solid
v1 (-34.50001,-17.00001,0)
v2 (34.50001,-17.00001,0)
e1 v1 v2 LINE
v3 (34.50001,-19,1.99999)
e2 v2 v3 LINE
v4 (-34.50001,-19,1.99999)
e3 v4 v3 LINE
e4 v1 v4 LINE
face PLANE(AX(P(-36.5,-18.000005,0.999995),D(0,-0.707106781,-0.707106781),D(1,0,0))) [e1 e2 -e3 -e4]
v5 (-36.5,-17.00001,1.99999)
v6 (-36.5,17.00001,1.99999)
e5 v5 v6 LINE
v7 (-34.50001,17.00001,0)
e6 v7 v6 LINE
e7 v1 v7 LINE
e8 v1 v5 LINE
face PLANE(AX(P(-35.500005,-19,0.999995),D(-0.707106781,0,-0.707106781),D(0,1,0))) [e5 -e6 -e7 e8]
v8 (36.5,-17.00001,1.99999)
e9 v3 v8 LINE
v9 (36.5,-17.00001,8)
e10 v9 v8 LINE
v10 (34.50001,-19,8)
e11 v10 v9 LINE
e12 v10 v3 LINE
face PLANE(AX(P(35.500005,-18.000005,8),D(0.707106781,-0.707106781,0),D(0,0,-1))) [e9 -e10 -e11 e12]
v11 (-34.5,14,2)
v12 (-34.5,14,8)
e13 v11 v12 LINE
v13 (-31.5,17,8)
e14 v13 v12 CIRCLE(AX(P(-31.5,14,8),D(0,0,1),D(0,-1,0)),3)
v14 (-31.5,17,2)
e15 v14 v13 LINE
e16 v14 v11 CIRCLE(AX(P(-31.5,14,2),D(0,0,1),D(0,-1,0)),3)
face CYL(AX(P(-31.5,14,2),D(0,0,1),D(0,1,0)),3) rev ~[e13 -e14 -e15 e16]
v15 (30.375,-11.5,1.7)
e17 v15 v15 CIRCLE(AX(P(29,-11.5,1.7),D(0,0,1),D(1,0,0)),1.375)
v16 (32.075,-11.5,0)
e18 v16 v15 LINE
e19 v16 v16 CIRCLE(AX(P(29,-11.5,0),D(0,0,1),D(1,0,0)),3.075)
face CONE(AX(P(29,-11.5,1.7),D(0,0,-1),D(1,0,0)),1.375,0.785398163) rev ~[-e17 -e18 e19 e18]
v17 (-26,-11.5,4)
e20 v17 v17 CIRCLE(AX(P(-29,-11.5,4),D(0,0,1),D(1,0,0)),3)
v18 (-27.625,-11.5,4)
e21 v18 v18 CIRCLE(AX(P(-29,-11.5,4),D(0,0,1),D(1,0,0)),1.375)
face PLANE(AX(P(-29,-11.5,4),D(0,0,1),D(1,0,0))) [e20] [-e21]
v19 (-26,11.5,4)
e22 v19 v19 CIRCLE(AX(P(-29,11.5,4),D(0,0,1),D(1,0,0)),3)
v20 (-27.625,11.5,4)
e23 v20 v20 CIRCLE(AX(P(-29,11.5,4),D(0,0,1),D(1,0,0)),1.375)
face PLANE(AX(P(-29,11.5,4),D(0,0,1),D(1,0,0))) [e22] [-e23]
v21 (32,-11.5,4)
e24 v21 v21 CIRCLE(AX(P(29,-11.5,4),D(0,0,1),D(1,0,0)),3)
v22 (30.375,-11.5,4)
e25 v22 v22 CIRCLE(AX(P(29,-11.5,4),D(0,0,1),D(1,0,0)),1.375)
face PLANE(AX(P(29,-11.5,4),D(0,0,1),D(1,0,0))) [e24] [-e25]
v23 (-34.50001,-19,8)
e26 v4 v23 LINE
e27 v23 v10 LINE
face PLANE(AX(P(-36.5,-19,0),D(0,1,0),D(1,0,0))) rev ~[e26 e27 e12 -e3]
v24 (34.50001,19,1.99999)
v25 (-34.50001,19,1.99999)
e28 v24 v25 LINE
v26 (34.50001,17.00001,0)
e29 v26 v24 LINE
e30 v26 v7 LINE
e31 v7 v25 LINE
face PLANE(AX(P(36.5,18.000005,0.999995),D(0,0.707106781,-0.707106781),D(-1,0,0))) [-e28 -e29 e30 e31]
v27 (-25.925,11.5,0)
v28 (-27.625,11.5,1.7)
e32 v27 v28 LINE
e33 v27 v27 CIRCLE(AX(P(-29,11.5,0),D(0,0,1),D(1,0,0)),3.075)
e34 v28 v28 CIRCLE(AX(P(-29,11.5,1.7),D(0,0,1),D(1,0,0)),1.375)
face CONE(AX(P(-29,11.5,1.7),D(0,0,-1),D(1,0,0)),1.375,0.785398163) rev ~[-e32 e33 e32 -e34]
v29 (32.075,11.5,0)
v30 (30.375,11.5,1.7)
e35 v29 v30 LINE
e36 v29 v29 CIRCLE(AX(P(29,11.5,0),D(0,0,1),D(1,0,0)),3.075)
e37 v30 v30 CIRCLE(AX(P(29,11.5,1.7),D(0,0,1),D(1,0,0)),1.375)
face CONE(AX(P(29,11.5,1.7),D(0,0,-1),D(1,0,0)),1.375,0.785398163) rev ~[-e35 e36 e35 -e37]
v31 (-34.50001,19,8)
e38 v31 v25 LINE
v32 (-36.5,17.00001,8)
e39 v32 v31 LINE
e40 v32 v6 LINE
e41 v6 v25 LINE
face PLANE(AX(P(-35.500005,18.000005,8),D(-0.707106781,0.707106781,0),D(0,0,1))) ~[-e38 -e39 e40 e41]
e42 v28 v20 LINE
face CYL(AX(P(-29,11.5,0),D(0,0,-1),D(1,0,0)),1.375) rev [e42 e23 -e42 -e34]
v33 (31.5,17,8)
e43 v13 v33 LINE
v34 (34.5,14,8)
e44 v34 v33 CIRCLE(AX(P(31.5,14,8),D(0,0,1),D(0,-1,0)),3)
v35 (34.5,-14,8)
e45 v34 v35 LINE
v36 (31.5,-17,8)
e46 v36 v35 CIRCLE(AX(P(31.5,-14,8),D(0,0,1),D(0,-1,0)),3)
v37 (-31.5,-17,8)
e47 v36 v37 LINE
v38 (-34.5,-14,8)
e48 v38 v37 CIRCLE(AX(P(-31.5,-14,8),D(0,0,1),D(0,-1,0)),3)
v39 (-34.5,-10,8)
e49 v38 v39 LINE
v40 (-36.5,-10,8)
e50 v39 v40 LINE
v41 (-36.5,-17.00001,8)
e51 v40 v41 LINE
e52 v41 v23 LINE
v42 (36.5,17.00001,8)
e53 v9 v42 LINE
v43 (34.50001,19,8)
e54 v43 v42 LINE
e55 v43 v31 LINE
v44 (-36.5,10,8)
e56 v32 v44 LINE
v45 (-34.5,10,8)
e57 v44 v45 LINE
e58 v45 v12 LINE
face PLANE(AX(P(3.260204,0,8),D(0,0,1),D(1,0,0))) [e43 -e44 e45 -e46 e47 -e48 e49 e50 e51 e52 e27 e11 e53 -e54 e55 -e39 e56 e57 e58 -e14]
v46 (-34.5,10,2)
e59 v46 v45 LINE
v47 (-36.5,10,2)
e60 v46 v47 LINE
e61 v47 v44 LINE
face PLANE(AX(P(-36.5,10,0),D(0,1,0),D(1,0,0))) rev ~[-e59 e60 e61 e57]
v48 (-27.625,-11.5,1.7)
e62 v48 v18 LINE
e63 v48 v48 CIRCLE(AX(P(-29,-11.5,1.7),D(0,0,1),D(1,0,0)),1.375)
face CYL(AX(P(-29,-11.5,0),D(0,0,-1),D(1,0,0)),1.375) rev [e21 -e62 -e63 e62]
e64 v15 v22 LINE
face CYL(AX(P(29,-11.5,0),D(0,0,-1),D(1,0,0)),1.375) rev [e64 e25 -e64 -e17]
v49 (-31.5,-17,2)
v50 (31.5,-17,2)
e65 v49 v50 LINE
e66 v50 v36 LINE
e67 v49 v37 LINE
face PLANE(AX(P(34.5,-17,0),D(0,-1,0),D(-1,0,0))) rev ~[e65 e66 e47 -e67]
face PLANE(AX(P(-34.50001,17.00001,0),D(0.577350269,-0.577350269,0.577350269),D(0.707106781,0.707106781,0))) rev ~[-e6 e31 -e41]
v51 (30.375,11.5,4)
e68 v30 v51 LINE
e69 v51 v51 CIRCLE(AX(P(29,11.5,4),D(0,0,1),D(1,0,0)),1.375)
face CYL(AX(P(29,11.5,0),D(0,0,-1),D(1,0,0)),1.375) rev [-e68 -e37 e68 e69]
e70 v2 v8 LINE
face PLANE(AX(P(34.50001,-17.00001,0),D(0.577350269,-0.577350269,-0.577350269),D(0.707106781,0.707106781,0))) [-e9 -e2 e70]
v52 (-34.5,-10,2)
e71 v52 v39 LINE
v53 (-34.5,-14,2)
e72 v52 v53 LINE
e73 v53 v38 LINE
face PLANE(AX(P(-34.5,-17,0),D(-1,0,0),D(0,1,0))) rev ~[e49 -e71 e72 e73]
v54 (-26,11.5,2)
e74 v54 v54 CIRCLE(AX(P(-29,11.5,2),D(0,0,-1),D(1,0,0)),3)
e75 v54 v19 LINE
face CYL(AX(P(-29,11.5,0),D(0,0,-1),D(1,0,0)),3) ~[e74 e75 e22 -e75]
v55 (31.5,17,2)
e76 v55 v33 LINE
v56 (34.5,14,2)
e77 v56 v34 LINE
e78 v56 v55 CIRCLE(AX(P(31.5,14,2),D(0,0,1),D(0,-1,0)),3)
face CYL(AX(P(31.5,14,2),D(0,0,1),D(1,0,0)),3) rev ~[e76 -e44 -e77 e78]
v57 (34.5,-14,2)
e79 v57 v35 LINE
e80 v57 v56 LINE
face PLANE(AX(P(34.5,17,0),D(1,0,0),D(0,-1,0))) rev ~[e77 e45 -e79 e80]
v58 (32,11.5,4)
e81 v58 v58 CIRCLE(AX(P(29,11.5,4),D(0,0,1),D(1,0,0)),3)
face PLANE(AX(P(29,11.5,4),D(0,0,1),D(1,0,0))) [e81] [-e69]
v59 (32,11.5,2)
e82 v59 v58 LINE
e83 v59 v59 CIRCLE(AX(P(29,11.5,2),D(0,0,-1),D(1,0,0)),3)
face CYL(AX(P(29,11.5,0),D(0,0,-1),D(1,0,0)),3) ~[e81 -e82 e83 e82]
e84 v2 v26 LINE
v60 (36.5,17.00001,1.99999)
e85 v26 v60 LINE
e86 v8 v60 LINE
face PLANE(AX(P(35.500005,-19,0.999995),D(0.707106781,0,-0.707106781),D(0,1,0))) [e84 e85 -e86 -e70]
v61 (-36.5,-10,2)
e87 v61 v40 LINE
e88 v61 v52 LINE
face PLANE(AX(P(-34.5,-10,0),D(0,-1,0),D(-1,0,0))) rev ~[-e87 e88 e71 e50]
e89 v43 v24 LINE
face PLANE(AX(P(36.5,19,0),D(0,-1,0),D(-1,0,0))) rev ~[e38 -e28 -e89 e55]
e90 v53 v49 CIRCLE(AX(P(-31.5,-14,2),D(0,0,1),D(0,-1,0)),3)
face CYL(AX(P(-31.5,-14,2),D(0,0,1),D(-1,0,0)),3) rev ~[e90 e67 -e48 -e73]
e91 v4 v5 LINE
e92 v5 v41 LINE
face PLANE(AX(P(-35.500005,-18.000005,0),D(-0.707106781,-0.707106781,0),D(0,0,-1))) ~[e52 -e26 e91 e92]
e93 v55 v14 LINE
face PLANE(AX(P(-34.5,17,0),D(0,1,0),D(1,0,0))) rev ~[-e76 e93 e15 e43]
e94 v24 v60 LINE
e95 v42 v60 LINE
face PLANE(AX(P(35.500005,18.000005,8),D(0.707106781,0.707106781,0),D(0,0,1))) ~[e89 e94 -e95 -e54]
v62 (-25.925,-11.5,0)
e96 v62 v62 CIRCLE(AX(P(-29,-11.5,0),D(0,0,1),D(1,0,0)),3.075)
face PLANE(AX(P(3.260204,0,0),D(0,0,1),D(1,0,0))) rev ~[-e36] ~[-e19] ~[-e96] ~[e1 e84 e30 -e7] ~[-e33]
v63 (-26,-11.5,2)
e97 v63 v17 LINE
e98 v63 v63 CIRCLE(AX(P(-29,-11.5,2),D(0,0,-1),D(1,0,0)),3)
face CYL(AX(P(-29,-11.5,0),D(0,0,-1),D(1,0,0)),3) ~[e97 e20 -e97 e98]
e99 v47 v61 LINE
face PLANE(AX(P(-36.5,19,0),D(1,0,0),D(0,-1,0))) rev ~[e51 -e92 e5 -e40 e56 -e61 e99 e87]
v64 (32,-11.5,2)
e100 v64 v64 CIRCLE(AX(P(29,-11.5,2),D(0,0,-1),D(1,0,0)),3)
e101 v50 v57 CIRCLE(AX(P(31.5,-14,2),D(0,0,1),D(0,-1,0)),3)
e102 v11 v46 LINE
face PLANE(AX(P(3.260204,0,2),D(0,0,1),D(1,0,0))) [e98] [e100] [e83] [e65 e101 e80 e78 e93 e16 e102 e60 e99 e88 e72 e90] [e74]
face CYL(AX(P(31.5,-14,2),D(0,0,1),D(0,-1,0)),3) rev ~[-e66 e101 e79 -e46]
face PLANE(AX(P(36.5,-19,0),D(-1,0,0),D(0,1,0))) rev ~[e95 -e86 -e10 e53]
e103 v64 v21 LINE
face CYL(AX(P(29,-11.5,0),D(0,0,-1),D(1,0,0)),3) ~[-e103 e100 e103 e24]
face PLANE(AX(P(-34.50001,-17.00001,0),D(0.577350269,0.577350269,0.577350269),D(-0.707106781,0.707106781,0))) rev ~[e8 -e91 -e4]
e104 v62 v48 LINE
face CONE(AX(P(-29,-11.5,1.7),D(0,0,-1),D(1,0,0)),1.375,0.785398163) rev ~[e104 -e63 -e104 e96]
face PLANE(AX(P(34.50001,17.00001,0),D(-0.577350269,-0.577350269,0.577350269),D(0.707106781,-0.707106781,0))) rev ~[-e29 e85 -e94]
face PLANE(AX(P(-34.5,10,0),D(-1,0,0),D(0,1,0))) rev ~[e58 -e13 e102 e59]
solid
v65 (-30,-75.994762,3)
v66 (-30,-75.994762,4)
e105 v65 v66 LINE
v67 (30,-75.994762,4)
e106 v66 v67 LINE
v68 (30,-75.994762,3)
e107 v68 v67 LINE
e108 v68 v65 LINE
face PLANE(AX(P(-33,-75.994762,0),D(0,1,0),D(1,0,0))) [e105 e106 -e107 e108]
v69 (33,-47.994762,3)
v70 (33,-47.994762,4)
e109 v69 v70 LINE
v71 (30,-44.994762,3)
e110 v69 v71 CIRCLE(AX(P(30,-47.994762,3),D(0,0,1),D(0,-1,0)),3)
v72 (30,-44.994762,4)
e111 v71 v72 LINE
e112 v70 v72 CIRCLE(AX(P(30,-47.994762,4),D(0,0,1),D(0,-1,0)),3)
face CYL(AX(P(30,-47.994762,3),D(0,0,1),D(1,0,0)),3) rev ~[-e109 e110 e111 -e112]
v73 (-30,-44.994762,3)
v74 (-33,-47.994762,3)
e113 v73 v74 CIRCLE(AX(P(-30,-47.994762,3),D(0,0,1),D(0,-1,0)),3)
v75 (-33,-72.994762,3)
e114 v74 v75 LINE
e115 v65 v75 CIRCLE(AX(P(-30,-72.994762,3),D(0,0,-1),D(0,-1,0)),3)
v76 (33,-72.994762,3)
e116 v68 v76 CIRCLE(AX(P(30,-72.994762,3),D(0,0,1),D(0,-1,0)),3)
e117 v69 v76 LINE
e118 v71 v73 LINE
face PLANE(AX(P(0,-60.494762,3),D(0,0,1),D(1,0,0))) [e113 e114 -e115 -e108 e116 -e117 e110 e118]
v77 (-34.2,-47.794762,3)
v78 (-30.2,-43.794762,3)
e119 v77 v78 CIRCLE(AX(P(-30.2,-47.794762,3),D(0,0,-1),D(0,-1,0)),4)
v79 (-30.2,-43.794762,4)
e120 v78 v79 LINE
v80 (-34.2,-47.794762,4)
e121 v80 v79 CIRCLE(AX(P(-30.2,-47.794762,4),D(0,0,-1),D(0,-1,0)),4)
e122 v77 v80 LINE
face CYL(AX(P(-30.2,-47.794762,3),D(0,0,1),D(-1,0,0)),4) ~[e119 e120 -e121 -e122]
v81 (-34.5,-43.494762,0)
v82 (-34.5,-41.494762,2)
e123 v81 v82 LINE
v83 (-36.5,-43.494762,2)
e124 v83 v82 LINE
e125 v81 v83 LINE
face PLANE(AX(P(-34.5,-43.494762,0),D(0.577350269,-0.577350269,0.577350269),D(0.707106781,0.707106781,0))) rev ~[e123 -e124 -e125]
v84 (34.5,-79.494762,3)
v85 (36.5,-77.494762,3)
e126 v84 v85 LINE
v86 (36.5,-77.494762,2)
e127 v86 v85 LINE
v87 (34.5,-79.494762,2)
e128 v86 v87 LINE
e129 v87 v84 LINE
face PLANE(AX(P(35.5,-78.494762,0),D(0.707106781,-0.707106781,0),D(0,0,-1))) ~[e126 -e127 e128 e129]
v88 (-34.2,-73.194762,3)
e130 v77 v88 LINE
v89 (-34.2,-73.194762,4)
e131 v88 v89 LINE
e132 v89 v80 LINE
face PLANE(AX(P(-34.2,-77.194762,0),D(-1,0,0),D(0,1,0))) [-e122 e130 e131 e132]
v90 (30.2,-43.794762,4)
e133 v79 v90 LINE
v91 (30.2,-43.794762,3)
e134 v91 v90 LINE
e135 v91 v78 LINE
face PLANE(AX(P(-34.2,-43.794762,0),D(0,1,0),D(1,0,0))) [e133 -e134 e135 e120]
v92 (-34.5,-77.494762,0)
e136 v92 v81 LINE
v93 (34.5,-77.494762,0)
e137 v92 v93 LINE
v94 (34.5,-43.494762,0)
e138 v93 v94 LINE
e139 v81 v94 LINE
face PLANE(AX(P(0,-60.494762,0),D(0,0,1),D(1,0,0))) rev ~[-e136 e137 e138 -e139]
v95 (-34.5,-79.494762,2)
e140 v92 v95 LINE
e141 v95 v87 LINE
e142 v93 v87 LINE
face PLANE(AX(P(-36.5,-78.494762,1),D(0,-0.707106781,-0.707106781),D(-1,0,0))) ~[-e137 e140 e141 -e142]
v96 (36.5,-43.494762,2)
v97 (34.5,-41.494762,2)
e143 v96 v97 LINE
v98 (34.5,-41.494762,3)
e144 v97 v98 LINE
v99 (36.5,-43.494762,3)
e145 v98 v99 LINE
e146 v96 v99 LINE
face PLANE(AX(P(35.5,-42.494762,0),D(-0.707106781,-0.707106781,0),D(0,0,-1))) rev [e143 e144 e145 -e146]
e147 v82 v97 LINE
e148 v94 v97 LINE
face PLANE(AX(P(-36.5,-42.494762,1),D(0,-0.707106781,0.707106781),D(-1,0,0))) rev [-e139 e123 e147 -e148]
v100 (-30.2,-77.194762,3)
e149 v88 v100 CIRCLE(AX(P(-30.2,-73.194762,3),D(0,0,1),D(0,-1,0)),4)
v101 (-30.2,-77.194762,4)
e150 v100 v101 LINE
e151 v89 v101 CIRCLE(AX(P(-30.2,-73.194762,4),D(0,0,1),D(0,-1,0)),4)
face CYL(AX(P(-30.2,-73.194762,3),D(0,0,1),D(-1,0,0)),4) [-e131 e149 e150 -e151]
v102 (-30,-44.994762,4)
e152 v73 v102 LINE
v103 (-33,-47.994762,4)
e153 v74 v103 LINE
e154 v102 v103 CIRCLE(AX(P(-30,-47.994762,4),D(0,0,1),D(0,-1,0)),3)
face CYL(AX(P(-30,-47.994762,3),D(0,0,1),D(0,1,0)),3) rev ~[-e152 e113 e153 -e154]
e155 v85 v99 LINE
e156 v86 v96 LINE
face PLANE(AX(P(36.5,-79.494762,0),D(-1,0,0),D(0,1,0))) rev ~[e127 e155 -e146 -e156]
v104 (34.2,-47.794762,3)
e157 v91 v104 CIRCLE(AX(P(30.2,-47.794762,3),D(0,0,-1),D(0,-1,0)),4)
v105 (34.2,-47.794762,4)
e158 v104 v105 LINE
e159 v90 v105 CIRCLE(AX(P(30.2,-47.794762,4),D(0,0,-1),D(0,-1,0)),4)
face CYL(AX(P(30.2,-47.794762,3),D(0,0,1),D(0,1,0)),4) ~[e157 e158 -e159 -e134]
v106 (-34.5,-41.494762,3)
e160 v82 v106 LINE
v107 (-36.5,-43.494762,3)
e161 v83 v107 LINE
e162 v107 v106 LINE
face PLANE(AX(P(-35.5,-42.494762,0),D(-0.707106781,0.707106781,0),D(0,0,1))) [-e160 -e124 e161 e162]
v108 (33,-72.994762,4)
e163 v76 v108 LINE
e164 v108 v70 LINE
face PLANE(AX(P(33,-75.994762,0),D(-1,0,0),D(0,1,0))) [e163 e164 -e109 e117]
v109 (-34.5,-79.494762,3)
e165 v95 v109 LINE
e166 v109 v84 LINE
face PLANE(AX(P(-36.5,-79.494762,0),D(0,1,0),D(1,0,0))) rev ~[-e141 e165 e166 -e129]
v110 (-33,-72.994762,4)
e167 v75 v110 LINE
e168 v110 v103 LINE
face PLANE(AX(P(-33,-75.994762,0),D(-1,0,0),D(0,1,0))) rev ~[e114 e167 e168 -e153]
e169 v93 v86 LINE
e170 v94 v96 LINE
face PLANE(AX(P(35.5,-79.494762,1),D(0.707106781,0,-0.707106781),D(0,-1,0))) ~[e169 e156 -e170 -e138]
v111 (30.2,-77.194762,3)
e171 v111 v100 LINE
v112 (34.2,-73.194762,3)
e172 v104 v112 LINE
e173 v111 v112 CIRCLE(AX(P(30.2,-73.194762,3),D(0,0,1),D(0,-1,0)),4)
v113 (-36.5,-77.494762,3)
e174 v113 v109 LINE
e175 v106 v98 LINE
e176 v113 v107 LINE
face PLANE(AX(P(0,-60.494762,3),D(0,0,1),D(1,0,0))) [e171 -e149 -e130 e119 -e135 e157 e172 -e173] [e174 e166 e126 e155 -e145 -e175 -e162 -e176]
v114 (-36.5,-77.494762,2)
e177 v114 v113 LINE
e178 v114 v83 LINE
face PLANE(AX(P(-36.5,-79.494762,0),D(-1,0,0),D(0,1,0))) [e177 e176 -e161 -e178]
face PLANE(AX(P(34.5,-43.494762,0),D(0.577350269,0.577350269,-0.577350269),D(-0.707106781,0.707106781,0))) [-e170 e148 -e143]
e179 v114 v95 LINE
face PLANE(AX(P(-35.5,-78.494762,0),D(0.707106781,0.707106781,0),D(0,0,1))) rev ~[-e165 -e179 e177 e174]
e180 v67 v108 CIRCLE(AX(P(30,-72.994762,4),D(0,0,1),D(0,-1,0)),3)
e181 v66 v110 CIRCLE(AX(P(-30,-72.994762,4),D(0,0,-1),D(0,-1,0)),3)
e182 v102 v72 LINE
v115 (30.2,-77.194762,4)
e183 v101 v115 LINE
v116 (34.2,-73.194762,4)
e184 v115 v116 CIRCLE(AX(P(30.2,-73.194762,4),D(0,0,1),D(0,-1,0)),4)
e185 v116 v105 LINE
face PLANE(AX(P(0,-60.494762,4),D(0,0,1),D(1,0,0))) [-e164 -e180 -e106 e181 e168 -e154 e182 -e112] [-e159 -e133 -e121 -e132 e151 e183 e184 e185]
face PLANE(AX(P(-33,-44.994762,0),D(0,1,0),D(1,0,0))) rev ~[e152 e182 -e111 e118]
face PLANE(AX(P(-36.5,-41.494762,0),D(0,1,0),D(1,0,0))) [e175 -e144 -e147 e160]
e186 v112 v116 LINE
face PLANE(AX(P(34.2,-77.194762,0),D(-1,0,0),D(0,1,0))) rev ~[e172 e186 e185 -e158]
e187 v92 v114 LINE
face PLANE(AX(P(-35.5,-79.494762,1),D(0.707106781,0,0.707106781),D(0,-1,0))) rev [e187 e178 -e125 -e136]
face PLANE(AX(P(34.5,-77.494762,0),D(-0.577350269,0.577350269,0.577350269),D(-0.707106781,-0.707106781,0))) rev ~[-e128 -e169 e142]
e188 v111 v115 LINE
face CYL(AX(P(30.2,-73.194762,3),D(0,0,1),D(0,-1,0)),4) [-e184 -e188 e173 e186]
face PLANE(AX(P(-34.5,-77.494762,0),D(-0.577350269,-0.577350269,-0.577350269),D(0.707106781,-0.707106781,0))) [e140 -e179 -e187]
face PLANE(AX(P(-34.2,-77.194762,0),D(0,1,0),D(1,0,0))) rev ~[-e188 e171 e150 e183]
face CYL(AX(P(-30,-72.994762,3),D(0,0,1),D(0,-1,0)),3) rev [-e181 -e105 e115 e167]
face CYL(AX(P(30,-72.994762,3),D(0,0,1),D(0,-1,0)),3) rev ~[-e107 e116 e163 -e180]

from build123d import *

# Parameters (mm, degrees)
F0_W     = 65
F0_H     = 30
F0_R     = 3
F0_R_2   = 1.375
F0_W_2   = 2
F0_H_2   = 20
F1_DEPTH = 2
F2_DEPTH = 4
F3_DEPTH = 8
F4_R     = 3
F5_SIZE  = 1.99999
F6_SIZE  = 1.7
F7_W     = 73
F7_H     = 38
F7_W_2   = 68.4
F7_H_2   = 33.4
F7_W_3   = 66
F7_H_3   = 31
F7_W_4   = 65
F7_H_4   = 30
F8_DEPTH = 3
F9_DEPTH = 4
F10_R    = 3
F11_R    = 4
F12_SIZE = 2


# Not quite as in the source:
# - a fillet or chamfer is up to 0.001 mm smaller than in the source, because OpenCascade refuses the exact size


with BuildPart() as f1:
    # F0 (on Top) → F1 (new body)
    with BuildSketch(Plane.XY):
        Polygon((-34.5, 10), (-34.5, 17), (34.5, 17), (34.5, -17), (-34.5, -17), (-34.5, -10), (-36.5, -10), (-36.5, -19), (36.5, -19), (36.5, 19), (-36.5, 19), (-36.5, 10), align=None)
        Polygon((34.5, 17), (-34.5, 17), (-34.5, 10), (-34.5, -10), (-34.5, -17), (34.5, -17), align=None)
        Rectangle(F0_W, F0_H, mode=Mode.SUBTRACT)
        Rectangle(F0_W, F0_H)
        with Locations((-29, -11.5)):
            Circle(F0_R, mode=Mode.SUBTRACT)
        with Locations((29, -11.5)):
            Circle(F0_R, mode=Mode.SUBTRACT)
        with Locations((-29, 11.5)):
            Circle(F0_R, mode=Mode.SUBTRACT)
        with Locations((29, 11.5)):
            Circle(F0_R, mode=Mode.SUBTRACT)
        with Locations((-29, 11.5)):
            Circle(F0_R)
        with Locations((-29, 11.5)):
            Circle(F0_R_2, mode=Mode.SUBTRACT)
        with Locations((29, 11.5)):
            Circle(F0_R)
        with Locations((29, 11.5)):
            Circle(F0_R_2, mode=Mode.SUBTRACT)
        with Locations((29, -11.5)):
            Circle(F0_R)
        with Locations((29, -11.5)):
            Circle(F0_R_2, mode=Mode.SUBTRACT)
        with Locations((-29, -11.5)):
            Circle(F0_R)
        with Locations((-29, -11.5)):
            Circle(F0_R_2, mode=Mode.SUBTRACT)
        with Locations((-35.5, 0)):
            Rectangle(F0_W_2, F0_H_2)
    extrude(amount=F1_DEPTH)

    # F0 (on Top) → F2 (join)
    with BuildSketch(Plane.XY):
        with Locations((-29, -11.5)):
            Circle(F0_R)
        with Locations((-29, -11.5)):
            Circle(F0_R_2, mode=Mode.SUBTRACT)
        with Locations((-29, 11.5)):
            Circle(F0_R)
        with Locations((-29, 11.5)):
            Circle(F0_R_2, mode=Mode.SUBTRACT)
        with Locations((29, -11.5)):
            Circle(F0_R)
        with Locations((29, -11.5)):
            Circle(F0_R_2, mode=Mode.SUBTRACT)
        with Locations((29, 11.5)):
            Circle(F0_R)
        with Locations((29, 11.5)):
            Circle(F0_R_2, mode=Mode.SUBTRACT)
    extrude(amount=F2_DEPTH)

    # F0 (on Top) → F3 (join)
    with BuildSketch(Plane.XY):
        Polygon((-34.5, 10), (-34.5, 17), (34.5, 17), (34.5, -17), (-34.5, -17), (-34.5, -10), (-36.5, -10), (-36.5, -19), (36.5, -19), (36.5, 19), (-36.5, 19), (-36.5, 10), align=None)
    extrude(amount=F3_DEPTH)

    # F4
    f4_edges = [f1.edges().sort_by_distance(p)[0] for p in [
        (-34.5, 17, 5),
        (-34.5, -17, 5),
        (34.5, -17, 5),
        (34.5, 17, 5),
    ]]
    fillet(f4_edges, radius=F4_R)

    # F5 (size 2 in the source; OpenCascade refuses exactly that, so slightly less here)
    f5_edges = [f1.edges().sort_by_distance(p)[0] for p in [
        (36.5, -19, 4),
        (36.5, 19, 4),
        (-36.5, 19, 4),
        (-36.5, -19, 4),
        (0, -19, 0),
        (-36.5, 0, 0),
        (0, 19, 0),
        (36.5, 0, 0),
    ]]
    chamfer(f5_edges, length=F5_SIZE)

    # F6
    f6_edges = [f1.edges().sort_by_distance(p)[0] for p in [
        (27.625, 11.5, 0),
        (27.625, -11.5, 0),
        (-30.375, -11.5, 0),
        (-30.375, 11.5, 0),
    ]]
    chamfer(f6_edges, length=F6_SIZE)


with BuildPart() as f8:
    # F7 (on Top) → F8 (new body)
    with BuildSketch(Plane.XY):
        with Locations((0, -60.494761914)):
            Rectangle(F7_W, F7_H)
        with Locations((0, -60.494761914)):
            Rectangle(F7_W_2, F7_H_2, mode=Mode.SUBTRACT)
        with Locations((0, -60.494761914)):
            Rectangle(F7_W_2, F7_H_2)
        with Locations((0, -60.494761914)):
            Rectangle(F7_W_3, F7_H_3, mode=Mode.SUBTRACT)
        with Locations((0, -60.494761914)):
            Rectangle(F7_W_3, F7_H_3)
        with Locations((0, -60.494761914)):
            Rectangle(F7_W_4, F7_H_4, mode=Mode.SUBTRACT)
        with Locations((0, -60.494761914)):
            Rectangle(F7_W_4, F7_H_4)
    extrude(amount=F8_DEPTH)

    # F7 (on Top) → F9 (join)
    with BuildSketch(Plane.XY):
        with Locations((0, -60.494761914)):
            Rectangle(F7_W_2, F7_H_2)
        with Locations((0, -60.494761914)):
            Rectangle(F7_W_3, F7_H_3, mode=Mode.SUBTRACT)
    extrude(amount=F9_DEPTH)

    # F10
    f10_edges = [f8.edges().sort_by_distance(p)[0] for p in [
        (33, -44.994762, 3.5),
        (-33, -44.994762, 3.5),
        (-33, -75.994762, 3.5),
        (33, -75.994762, 3.5),
    ]]
    fillet(f10_edges, radius=F10_R)

    # F11
    f11_edges = [f8.edges().sort_by_distance(p)[0] for p in [
        (-34.2, -43.794762, 3.5),
        (-34.2, -77.194762, 3.5),
        (34.2, -77.194762, 3.5),
        (34.2, -43.794762, 3.5),
    ]]
    fillet(f11_edges, radius=F11_R)

    # F12
    f12_edges = [f8.edges().sort_by_distance(p)[0] for p in [
        (36.5, -79.494762, 1.5),
        (36.5, -41.494762, 1.5),
        (-36.5, -41.494762, 1.5),
        (-36.5, -79.494762, 1.5),
        (-36.5, -60.494762, 0),
        (36.5, -60.494762, 0),
        (0, -41.494762, 0),
        (0, -79.494762, 0),
    ]]
    chamfer(f12_edges, length=F12_SIZE)


solid = Compound([f1.part, f8.part])
